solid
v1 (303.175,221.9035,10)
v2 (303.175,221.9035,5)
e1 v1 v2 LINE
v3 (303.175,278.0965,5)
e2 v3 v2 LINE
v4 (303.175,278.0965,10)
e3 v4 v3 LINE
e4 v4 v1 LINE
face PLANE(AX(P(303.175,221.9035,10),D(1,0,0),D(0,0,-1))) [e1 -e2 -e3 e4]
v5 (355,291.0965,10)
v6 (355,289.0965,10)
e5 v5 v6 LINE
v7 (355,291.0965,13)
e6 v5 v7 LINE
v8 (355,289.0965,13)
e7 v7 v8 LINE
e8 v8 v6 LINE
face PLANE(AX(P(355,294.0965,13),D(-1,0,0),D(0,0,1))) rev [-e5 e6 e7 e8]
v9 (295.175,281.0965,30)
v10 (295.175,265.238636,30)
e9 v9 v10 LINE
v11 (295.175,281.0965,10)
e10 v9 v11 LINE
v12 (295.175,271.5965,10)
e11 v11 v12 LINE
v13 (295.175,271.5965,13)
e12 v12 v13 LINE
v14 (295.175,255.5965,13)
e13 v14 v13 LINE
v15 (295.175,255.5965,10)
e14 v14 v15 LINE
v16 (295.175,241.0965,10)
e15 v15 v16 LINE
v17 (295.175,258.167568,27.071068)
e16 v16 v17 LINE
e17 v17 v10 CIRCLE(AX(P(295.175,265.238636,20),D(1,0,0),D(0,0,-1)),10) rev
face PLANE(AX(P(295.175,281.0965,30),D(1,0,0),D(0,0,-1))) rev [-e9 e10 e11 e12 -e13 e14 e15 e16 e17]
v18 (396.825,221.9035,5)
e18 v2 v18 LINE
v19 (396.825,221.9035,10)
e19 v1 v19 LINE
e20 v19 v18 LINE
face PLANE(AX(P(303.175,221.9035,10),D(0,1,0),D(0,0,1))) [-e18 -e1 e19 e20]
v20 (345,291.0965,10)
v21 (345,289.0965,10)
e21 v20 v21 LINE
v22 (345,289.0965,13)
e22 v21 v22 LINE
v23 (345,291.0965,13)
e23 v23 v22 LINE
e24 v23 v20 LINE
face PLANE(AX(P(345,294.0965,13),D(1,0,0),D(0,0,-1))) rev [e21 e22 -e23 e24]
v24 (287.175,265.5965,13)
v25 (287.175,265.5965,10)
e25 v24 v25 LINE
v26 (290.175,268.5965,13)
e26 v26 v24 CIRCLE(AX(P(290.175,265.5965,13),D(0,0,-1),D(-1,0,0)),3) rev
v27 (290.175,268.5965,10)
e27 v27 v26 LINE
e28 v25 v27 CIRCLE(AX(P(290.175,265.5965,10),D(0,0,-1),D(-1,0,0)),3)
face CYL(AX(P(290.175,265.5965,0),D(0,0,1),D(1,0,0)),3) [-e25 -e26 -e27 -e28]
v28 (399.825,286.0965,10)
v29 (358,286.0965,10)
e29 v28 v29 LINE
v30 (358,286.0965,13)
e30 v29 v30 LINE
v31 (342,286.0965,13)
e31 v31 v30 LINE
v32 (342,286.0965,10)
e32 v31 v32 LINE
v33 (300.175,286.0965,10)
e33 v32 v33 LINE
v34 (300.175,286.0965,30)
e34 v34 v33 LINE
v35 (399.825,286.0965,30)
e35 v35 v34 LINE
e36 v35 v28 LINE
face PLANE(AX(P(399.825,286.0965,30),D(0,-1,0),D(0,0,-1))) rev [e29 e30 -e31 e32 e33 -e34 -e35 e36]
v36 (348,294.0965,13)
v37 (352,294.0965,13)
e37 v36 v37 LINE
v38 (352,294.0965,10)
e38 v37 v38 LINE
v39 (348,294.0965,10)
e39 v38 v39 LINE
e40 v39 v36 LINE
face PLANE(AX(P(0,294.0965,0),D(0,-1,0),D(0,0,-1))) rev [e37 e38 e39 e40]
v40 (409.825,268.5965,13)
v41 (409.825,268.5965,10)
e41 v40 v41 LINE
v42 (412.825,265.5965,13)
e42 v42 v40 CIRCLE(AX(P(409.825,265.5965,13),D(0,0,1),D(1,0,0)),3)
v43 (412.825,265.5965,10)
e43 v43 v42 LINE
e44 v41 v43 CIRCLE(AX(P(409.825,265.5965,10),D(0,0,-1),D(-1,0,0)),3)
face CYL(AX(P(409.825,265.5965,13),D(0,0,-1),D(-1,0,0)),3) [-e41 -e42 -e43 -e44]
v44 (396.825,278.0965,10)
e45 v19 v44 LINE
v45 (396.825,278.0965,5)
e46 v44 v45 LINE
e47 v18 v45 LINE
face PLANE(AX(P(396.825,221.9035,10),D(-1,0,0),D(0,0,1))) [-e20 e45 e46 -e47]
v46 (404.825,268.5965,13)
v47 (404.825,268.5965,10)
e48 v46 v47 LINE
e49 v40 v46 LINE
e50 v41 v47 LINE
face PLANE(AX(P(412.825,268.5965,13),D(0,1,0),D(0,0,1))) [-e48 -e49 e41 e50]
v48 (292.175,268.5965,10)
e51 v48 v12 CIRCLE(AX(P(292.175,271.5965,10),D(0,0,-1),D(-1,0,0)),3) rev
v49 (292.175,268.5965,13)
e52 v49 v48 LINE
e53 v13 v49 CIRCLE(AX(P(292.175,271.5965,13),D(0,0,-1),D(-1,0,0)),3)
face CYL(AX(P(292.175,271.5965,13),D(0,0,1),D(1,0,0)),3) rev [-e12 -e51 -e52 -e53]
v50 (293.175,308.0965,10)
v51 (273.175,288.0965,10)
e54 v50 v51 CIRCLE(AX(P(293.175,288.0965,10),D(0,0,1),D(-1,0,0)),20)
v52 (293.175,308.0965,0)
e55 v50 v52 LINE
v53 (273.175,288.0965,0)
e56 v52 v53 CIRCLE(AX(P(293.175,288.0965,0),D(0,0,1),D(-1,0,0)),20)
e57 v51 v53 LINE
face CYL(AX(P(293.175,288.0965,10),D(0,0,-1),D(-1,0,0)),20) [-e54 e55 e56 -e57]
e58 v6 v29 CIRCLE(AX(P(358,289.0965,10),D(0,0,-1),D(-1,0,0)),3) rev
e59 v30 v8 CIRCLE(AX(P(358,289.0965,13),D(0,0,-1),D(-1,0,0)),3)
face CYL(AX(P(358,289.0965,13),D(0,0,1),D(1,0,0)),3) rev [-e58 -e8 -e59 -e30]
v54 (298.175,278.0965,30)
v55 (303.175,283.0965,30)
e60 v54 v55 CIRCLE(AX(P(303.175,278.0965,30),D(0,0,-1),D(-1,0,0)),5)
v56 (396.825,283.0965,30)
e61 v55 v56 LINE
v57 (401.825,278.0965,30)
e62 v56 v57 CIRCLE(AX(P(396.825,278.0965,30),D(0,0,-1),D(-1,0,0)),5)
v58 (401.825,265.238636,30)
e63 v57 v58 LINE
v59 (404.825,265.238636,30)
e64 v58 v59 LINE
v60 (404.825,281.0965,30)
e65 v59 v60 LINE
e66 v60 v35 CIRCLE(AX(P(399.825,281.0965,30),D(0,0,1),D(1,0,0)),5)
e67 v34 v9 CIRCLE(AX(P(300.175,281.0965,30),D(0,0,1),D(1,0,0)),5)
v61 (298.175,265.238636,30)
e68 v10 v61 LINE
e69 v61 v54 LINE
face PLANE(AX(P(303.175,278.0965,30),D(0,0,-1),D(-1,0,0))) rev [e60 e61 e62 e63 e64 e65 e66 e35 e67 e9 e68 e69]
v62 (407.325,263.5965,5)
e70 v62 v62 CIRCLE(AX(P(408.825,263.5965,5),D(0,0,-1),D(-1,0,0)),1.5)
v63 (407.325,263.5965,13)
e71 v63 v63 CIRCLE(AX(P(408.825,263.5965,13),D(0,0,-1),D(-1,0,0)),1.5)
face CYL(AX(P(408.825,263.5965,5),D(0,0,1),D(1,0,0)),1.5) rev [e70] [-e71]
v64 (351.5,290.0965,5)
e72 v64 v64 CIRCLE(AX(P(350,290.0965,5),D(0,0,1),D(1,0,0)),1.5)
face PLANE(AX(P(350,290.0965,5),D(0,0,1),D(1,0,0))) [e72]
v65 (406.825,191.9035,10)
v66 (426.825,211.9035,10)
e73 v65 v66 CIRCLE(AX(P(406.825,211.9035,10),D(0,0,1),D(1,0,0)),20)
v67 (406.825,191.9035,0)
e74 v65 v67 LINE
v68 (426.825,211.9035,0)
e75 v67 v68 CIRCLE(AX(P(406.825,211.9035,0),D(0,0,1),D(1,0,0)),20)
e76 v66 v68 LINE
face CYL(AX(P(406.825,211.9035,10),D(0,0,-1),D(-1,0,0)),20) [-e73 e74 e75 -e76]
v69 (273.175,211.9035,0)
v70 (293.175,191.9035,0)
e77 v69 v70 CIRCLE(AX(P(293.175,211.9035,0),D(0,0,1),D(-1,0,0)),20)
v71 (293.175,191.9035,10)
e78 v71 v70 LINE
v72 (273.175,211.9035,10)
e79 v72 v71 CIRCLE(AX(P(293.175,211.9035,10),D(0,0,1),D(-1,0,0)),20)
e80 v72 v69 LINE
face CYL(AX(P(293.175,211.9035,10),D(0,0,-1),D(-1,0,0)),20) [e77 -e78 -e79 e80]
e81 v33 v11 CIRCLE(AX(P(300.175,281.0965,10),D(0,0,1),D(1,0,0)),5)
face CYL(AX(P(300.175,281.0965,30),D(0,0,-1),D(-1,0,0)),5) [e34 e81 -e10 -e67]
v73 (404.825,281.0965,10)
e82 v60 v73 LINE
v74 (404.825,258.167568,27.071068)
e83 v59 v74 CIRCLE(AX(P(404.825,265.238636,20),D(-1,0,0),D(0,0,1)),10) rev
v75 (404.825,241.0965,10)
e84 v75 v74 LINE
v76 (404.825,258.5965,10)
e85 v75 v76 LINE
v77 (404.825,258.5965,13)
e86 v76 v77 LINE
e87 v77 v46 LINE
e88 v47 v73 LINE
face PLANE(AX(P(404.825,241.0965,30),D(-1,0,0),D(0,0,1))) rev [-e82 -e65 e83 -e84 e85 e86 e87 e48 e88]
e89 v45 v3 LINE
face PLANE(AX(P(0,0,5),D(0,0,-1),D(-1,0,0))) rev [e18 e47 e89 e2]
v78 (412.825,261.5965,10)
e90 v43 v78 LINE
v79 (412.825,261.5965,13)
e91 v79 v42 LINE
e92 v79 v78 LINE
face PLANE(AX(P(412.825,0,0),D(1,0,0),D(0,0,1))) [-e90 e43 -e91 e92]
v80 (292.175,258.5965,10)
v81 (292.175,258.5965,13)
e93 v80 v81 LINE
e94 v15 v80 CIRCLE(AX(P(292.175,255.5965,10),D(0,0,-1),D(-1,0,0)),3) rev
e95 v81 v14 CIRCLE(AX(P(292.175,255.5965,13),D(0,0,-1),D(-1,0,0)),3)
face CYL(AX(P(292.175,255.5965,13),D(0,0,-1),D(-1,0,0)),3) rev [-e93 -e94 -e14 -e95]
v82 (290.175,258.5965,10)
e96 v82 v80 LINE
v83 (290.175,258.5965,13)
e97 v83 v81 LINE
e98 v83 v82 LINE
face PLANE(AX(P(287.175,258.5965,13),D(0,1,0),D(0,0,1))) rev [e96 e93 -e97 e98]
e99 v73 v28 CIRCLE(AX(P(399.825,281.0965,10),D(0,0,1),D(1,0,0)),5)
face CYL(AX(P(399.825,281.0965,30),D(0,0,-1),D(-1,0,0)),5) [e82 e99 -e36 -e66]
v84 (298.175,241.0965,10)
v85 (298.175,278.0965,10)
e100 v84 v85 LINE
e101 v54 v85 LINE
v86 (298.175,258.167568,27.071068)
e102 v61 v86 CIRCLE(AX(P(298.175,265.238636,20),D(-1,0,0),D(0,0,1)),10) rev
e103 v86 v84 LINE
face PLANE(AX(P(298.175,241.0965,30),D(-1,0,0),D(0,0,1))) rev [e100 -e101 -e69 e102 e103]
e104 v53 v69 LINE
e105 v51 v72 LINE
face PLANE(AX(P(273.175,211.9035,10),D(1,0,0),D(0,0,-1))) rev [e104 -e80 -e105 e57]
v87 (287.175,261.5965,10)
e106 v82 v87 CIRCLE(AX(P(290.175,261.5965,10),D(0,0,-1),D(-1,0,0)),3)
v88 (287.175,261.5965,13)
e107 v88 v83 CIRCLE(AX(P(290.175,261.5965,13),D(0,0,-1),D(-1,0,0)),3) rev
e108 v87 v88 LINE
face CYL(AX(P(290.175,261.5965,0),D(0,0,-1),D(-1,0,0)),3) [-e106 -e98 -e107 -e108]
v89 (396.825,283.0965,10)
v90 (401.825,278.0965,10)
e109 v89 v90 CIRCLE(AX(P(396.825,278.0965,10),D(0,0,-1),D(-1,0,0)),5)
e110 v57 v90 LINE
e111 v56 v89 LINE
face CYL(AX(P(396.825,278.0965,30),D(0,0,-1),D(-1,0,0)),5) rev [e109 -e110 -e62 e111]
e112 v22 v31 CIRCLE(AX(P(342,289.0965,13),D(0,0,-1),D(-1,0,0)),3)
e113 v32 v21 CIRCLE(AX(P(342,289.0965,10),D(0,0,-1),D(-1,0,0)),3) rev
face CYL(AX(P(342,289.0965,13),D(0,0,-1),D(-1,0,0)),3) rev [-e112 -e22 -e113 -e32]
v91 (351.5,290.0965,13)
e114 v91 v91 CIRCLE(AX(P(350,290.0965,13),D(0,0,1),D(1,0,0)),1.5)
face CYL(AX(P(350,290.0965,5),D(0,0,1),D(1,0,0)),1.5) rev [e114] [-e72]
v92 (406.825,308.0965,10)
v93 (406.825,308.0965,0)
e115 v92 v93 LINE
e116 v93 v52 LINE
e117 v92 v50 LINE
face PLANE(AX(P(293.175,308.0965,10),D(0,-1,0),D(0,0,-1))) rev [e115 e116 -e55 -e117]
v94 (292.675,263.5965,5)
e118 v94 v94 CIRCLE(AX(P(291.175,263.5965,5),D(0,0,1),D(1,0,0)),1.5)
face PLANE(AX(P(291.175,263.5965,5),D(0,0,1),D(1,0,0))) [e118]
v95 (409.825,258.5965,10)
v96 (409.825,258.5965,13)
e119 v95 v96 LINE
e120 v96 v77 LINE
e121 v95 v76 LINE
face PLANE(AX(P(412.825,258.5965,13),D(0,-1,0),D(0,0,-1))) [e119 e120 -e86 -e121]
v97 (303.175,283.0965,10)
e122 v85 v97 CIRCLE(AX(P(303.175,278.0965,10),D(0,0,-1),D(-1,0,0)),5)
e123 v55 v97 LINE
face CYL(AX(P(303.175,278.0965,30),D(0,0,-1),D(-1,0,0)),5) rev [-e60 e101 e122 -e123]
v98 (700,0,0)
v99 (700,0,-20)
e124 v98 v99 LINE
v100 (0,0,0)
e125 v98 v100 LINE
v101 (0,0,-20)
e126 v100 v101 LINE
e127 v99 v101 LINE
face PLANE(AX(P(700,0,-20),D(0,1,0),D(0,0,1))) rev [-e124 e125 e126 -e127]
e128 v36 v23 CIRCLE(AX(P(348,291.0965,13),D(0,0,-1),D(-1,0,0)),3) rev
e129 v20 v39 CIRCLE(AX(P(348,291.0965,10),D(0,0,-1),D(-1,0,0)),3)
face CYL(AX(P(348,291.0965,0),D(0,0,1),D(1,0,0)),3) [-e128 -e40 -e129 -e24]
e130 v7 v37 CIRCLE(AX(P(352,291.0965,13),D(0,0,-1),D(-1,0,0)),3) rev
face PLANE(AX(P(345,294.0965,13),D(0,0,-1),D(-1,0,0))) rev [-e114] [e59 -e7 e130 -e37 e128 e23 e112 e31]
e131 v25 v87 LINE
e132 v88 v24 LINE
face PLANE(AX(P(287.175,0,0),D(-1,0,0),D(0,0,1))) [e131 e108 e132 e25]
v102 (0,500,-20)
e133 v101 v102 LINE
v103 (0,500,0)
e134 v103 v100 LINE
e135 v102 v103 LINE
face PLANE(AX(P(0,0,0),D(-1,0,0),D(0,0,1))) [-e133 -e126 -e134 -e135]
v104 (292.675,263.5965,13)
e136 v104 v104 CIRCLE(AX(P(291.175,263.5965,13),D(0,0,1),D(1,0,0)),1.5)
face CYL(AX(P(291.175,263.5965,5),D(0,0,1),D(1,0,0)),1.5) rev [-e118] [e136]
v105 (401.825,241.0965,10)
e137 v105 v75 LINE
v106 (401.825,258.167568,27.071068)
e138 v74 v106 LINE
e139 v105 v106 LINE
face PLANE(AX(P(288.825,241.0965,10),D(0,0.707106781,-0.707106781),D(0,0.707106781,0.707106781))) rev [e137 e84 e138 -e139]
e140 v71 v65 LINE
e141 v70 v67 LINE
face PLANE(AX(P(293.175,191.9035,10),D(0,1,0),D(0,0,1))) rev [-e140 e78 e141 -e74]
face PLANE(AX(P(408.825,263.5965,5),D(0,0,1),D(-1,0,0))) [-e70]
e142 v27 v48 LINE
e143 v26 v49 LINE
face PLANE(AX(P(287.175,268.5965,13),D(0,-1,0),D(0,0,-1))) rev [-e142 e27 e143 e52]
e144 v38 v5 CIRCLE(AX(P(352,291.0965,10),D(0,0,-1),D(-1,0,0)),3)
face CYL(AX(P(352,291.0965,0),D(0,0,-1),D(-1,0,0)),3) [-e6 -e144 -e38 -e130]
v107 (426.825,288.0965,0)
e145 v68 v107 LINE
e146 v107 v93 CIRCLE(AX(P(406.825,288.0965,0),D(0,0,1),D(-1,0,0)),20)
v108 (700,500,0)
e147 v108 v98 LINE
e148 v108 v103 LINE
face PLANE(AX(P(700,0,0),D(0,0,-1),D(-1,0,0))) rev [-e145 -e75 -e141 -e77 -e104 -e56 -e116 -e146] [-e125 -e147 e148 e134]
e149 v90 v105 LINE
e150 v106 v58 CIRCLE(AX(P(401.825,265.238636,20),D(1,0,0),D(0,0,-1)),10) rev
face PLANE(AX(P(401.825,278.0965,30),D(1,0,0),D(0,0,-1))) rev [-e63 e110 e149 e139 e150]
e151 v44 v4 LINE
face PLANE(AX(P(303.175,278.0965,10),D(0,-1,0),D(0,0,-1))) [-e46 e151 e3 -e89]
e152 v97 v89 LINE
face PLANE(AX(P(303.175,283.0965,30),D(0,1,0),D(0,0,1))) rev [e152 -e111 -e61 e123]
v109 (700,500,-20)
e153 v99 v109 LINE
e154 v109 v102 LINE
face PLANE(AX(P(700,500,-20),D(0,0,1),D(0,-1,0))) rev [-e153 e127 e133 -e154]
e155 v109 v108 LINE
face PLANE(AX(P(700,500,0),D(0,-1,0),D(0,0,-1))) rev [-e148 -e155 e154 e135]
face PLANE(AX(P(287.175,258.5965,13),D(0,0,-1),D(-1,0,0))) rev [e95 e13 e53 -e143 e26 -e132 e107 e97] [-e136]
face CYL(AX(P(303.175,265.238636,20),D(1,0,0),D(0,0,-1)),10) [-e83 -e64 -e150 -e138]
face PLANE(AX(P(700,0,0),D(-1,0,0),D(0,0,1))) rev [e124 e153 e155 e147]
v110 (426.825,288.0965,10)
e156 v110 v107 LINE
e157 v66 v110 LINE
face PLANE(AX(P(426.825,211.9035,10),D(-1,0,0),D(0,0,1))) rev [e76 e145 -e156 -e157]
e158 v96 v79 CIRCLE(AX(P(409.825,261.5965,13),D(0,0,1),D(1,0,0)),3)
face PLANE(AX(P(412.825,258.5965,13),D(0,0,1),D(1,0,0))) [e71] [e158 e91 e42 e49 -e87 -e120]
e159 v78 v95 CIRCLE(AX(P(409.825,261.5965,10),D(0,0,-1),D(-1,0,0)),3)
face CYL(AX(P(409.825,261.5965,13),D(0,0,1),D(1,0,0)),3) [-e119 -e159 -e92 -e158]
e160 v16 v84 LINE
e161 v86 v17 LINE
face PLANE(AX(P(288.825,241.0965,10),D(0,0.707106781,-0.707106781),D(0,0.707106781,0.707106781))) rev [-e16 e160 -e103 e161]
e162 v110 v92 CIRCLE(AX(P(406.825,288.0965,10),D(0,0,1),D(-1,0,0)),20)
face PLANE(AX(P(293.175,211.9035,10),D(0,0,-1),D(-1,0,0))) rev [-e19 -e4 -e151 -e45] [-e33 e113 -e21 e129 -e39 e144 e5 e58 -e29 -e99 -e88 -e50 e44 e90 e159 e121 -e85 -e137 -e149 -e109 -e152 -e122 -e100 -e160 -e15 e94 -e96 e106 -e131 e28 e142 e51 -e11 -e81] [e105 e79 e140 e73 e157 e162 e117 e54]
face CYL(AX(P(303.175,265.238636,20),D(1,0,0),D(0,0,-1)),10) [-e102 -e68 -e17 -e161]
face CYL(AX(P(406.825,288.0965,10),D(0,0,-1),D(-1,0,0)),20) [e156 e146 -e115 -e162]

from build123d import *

# Parameters (mm, degrees)
ESBO_O2_W                = 20
ESBO_O2_H                = 500
RESSALTO_EXTRUS_O1_DEPTH = 700
ESBO_O3_W                = 93.65
ESBO_O3_H                = 56.193
RESSALTO_EXTRUS_O2_DEPTH = 5
ESBO_O5_W                = 93.65
ESBO_O5_H                = 56.193
RESSALTO_EXTRUS_O3_DEPTH = 10
RESSALTO_EXTRUS_O4_DEPTH = 20
CORTE_EXTRUS_O1_DEPTH    = 116
FILETE1_R                = 10
ESBO_O8_W                = 3
ESBO_O8_H                = 10
RESSALTO_EXTRUS_O5_DEPTH = 8
FILETE2_R                = 3
ESBO_O9_R                = 1.5
CORTE_EXTRUS_O2_DEPTH    = 8
ESPELHAR1_START          = 5
ESPELHAR1_OUTLINE_R      = 1.5
ESPELHAR1_DEPTH          = 5
ESPELHAR1_START_2        = 10
ESPELHAR1_2_OUTLINE_R    = 1.5
ESPELHAR1_2_DEPTH        = 3
ESBO_O12_W               = 10
ESBO_O12_H               = 3
RESSALTO_EXTRUS_O6_DEPTH = 8
FILETE3_R                = 3
ESBO_O13_R               = 1.5
CORTE_EXTRUS_O3_DEPTH    = 8


# Read off the part's stored shape, not the designer's step: Espelhar1
with BuildPart() as part:
    # Esboço2 → Ressalto-extrusão1 (new body)
    with BuildSketch(Plane(origin=(0, 0, 0), x_dir=(0, 0, -1), z_dir=(1, 0, 0))):
        with Locations((10, 250)):
            Rectangle(ESBO_O2_W, ESBO_O2_H)
    extrude(amount=RESSALTO_EXTRUS_O1_DEPTH)

    # Esboço3 → Ressalto-extrusão2 (add)
    with BuildSketch(Plane.XY):
        with Locations((350, 250)):
            Rectangle(ESBO_O3_W, ESBO_O3_H)
    extrude(amount=RESSALTO_EXTRUS_O2_DEPTH)

    # Esboço5 → Ressalto-extrusão3 (add)
    with BuildSketch(Plane.XY):
        with BuildLine():
            Line((293.175, 191.9035), (406.825, 191.9035))
            ThreePointArc((406.825, 191.9035), (420.967135624, 197.761364376), (426.825, 211.9035))
            Line((426.825, 211.9035), (426.825, 288.0965))
            ThreePointArc((426.825, 288.0965), (420.967135624, 302.238635624), (406.825, 308.0965))
            Line((406.825, 308.0965), (293.175, 308.0965))
            ThreePointArc((293.175, 308.0965), (279.032864376, 302.238635624), (273.175, 288.0965))
            Line((273.175, 288.0965), (273.175, 211.9035))
            ThreePointArc((273.175, 211.9035), (279.032864376, 197.761364376), (293.175, 191.9035))
        make_face()
        with Locations((350, 250)):
            Rectangle(ESBO_O5_W, ESBO_O5_H, mode=Mode.SUBTRACT)
    extrude(amount=RESSALTO_EXTRUS_O3_DEPTH)

    # Esboço6 → Ressalto-extrusão4 (add)
    with BuildSketch(Plane.XY.offset(10)):
        with BuildLine():
            Line((298.175, 241.0965), (298.175, 278.0965))
            ThreePointArc((298.175, 278.0965), (299.639466094, 281.632033906), (303.175, 283.0965))
            Line((303.175, 283.0965), (396.825, 283.0965))
            ThreePointArc((396.825, 283.0965), (400.360533906, 281.632033906), (401.825, 278.0965))
            Line((401.825, 278.0965), (401.825, 241.0965))
            Line((401.825, 241.0965), (404.825, 241.0965))
            Line((404.825, 241.0965), (404.825, 281.0965))
            ThreePointArc((404.825, 281.0965), (403.360533906, 284.632033906), (399.825, 286.0965))
            Line((399.825, 286.0965), (300.175, 286.0965))
            ThreePointArc((300.175, 286.0965), (296.639466094, 284.632033906), (295.175, 281.0965))
            Line((295.175, 281.0965), (295.175, 241.0965))
            Line((295.175, 241.0965), (298.175, 241.0965))
        make_face()
    extrude(amount=RESSALTO_EXTRUS_O4_DEPTH)

    # Esboço7 → Corte-extrusão1 (cut)
    with BuildSketch(Plane(origin=(404.825, 0, 0), x_dir=(0, 0, -1), z_dir=(1, 0, 0))):
        Polygon((-10, 241.0965), (-30, 261.0965), (-30, 241.0965), align=None)
    extrude(amount=-CORTE_EXTRUS_O1_DEPTH, mode=Mode.SUBTRACT)

    # Filete1
    filete1_edges = [part.edges().sort_by_distance(p)[0] for p in [
        (403.325, 261.0965, 30),
        (296.675, 261.0965, 30),
    ]]
    fillet(filete1_edges, radius=FILETE1_R)

    # Esboço8 → Ressalto-extrusão5 (add)
    with BuildSketch(Plane.ZY.offset(-295.175)):
        with Locations((11.5, 263.5965)):
            Rectangle(ESBO_O8_W, ESBO_O8_H)
    extrude(amount=RESSALTO_EXTRUS_O5_DEPTH)

    # Filete2
    filete2_edges = [part.edges().sort_by_distance(p)[0] for p in [
        (295.175, 258.5965, 11.5),
        (295.175, 268.5965, 11.5),
        (287.175, 258.5965, 11.5),
        (287.175, 268.5965, 11.5),
    ]]
    fillet(filete2_edges, radius=FILETE2_R)

    # Esboço9 → Corte-extrusão2 (cut)
    with BuildSketch(Plane.XY.offset(13)):
        with Locations((291.175, 263.5965)):
            Circle(ESBO_O9_R)
    extrude(amount=-CORTE_EXTRUS_O2_DEPTH, mode=Mode.SUBTRACT)

    # Espelhar1 outline → Espelhar1 (cut)
    with BuildSketch(Plane.XY.offset(ESPELHAR1_START)):
        with Locations((408.825, 263.5965)):
            Circle(ESPELHAR1_OUTLINE_R)
    extrude(amount=ESPELHAR1_DEPTH, mode=Mode.SUBTRACT)

    # Espelhar1 2 outline → Espelhar1 2 (add)
    with BuildSketch(Plane.XY.offset(ESPELHAR1_START_2)):
        with BuildLine():
            Line((404.825, 268.5965), (404.825, 258.5965))
            Line((404.825, 258.5965), (409.825, 258.5965))
            ThreePointArc((409.825, 258.5965), (411.946320344, 259.475179656), (412.825, 261.5965))
            Line((412.825, 261.5965), (412.825, 265.5965))
            ThreePointArc((412.825, 265.5965), (411.946320344, 267.717820344), (409.825, 268.5965))
            Line((409.825, 268.5965), (404.825, 268.5965))
        make_face()
        with Locations((408.825, 263.5965)):
            Circle(ESPELHAR1_2_OUTLINE_R, mode=Mode.SUBTRACT)
    extrude(amount=ESPELHAR1_2_DEPTH)

    # Esboço12 → Ressalto-extrusão6 (add)
    with BuildSketch(Plane(origin=(0, 286.0965, 0), x_dir=(1, 0, 0), z_dir=(0, 1, 0))):
        with Locations((350, -11.5)):
            Rectangle(ESBO_O12_W, ESBO_O12_H)
    extrude(amount=RESSALTO_EXTRUS_O6_DEPTH)

    # Filete3
    filete3_edges = [part.edges().sort_by_distance(p)[0] for p in [
        (355, 286.0965, 11.5),
        (345, 286.0965, 11.5),
        (355, 294.0965, 11.5),
        (345, 294.0965, 11.5),
    ]]
    fillet(filete3_edges, radius=FILETE3_R)

    # Esboço13 → Corte-extrusão3 (cut)
    with BuildSketch(Plane.XY.offset(13)):
        with Locations((350, 290.0965)):
            Circle(ESBO_O13_R)
    extrude(amount=-CORTE_EXTRUS_O3_DEPTH, mode=Mode.SUBTRACT)


solid = part.part
